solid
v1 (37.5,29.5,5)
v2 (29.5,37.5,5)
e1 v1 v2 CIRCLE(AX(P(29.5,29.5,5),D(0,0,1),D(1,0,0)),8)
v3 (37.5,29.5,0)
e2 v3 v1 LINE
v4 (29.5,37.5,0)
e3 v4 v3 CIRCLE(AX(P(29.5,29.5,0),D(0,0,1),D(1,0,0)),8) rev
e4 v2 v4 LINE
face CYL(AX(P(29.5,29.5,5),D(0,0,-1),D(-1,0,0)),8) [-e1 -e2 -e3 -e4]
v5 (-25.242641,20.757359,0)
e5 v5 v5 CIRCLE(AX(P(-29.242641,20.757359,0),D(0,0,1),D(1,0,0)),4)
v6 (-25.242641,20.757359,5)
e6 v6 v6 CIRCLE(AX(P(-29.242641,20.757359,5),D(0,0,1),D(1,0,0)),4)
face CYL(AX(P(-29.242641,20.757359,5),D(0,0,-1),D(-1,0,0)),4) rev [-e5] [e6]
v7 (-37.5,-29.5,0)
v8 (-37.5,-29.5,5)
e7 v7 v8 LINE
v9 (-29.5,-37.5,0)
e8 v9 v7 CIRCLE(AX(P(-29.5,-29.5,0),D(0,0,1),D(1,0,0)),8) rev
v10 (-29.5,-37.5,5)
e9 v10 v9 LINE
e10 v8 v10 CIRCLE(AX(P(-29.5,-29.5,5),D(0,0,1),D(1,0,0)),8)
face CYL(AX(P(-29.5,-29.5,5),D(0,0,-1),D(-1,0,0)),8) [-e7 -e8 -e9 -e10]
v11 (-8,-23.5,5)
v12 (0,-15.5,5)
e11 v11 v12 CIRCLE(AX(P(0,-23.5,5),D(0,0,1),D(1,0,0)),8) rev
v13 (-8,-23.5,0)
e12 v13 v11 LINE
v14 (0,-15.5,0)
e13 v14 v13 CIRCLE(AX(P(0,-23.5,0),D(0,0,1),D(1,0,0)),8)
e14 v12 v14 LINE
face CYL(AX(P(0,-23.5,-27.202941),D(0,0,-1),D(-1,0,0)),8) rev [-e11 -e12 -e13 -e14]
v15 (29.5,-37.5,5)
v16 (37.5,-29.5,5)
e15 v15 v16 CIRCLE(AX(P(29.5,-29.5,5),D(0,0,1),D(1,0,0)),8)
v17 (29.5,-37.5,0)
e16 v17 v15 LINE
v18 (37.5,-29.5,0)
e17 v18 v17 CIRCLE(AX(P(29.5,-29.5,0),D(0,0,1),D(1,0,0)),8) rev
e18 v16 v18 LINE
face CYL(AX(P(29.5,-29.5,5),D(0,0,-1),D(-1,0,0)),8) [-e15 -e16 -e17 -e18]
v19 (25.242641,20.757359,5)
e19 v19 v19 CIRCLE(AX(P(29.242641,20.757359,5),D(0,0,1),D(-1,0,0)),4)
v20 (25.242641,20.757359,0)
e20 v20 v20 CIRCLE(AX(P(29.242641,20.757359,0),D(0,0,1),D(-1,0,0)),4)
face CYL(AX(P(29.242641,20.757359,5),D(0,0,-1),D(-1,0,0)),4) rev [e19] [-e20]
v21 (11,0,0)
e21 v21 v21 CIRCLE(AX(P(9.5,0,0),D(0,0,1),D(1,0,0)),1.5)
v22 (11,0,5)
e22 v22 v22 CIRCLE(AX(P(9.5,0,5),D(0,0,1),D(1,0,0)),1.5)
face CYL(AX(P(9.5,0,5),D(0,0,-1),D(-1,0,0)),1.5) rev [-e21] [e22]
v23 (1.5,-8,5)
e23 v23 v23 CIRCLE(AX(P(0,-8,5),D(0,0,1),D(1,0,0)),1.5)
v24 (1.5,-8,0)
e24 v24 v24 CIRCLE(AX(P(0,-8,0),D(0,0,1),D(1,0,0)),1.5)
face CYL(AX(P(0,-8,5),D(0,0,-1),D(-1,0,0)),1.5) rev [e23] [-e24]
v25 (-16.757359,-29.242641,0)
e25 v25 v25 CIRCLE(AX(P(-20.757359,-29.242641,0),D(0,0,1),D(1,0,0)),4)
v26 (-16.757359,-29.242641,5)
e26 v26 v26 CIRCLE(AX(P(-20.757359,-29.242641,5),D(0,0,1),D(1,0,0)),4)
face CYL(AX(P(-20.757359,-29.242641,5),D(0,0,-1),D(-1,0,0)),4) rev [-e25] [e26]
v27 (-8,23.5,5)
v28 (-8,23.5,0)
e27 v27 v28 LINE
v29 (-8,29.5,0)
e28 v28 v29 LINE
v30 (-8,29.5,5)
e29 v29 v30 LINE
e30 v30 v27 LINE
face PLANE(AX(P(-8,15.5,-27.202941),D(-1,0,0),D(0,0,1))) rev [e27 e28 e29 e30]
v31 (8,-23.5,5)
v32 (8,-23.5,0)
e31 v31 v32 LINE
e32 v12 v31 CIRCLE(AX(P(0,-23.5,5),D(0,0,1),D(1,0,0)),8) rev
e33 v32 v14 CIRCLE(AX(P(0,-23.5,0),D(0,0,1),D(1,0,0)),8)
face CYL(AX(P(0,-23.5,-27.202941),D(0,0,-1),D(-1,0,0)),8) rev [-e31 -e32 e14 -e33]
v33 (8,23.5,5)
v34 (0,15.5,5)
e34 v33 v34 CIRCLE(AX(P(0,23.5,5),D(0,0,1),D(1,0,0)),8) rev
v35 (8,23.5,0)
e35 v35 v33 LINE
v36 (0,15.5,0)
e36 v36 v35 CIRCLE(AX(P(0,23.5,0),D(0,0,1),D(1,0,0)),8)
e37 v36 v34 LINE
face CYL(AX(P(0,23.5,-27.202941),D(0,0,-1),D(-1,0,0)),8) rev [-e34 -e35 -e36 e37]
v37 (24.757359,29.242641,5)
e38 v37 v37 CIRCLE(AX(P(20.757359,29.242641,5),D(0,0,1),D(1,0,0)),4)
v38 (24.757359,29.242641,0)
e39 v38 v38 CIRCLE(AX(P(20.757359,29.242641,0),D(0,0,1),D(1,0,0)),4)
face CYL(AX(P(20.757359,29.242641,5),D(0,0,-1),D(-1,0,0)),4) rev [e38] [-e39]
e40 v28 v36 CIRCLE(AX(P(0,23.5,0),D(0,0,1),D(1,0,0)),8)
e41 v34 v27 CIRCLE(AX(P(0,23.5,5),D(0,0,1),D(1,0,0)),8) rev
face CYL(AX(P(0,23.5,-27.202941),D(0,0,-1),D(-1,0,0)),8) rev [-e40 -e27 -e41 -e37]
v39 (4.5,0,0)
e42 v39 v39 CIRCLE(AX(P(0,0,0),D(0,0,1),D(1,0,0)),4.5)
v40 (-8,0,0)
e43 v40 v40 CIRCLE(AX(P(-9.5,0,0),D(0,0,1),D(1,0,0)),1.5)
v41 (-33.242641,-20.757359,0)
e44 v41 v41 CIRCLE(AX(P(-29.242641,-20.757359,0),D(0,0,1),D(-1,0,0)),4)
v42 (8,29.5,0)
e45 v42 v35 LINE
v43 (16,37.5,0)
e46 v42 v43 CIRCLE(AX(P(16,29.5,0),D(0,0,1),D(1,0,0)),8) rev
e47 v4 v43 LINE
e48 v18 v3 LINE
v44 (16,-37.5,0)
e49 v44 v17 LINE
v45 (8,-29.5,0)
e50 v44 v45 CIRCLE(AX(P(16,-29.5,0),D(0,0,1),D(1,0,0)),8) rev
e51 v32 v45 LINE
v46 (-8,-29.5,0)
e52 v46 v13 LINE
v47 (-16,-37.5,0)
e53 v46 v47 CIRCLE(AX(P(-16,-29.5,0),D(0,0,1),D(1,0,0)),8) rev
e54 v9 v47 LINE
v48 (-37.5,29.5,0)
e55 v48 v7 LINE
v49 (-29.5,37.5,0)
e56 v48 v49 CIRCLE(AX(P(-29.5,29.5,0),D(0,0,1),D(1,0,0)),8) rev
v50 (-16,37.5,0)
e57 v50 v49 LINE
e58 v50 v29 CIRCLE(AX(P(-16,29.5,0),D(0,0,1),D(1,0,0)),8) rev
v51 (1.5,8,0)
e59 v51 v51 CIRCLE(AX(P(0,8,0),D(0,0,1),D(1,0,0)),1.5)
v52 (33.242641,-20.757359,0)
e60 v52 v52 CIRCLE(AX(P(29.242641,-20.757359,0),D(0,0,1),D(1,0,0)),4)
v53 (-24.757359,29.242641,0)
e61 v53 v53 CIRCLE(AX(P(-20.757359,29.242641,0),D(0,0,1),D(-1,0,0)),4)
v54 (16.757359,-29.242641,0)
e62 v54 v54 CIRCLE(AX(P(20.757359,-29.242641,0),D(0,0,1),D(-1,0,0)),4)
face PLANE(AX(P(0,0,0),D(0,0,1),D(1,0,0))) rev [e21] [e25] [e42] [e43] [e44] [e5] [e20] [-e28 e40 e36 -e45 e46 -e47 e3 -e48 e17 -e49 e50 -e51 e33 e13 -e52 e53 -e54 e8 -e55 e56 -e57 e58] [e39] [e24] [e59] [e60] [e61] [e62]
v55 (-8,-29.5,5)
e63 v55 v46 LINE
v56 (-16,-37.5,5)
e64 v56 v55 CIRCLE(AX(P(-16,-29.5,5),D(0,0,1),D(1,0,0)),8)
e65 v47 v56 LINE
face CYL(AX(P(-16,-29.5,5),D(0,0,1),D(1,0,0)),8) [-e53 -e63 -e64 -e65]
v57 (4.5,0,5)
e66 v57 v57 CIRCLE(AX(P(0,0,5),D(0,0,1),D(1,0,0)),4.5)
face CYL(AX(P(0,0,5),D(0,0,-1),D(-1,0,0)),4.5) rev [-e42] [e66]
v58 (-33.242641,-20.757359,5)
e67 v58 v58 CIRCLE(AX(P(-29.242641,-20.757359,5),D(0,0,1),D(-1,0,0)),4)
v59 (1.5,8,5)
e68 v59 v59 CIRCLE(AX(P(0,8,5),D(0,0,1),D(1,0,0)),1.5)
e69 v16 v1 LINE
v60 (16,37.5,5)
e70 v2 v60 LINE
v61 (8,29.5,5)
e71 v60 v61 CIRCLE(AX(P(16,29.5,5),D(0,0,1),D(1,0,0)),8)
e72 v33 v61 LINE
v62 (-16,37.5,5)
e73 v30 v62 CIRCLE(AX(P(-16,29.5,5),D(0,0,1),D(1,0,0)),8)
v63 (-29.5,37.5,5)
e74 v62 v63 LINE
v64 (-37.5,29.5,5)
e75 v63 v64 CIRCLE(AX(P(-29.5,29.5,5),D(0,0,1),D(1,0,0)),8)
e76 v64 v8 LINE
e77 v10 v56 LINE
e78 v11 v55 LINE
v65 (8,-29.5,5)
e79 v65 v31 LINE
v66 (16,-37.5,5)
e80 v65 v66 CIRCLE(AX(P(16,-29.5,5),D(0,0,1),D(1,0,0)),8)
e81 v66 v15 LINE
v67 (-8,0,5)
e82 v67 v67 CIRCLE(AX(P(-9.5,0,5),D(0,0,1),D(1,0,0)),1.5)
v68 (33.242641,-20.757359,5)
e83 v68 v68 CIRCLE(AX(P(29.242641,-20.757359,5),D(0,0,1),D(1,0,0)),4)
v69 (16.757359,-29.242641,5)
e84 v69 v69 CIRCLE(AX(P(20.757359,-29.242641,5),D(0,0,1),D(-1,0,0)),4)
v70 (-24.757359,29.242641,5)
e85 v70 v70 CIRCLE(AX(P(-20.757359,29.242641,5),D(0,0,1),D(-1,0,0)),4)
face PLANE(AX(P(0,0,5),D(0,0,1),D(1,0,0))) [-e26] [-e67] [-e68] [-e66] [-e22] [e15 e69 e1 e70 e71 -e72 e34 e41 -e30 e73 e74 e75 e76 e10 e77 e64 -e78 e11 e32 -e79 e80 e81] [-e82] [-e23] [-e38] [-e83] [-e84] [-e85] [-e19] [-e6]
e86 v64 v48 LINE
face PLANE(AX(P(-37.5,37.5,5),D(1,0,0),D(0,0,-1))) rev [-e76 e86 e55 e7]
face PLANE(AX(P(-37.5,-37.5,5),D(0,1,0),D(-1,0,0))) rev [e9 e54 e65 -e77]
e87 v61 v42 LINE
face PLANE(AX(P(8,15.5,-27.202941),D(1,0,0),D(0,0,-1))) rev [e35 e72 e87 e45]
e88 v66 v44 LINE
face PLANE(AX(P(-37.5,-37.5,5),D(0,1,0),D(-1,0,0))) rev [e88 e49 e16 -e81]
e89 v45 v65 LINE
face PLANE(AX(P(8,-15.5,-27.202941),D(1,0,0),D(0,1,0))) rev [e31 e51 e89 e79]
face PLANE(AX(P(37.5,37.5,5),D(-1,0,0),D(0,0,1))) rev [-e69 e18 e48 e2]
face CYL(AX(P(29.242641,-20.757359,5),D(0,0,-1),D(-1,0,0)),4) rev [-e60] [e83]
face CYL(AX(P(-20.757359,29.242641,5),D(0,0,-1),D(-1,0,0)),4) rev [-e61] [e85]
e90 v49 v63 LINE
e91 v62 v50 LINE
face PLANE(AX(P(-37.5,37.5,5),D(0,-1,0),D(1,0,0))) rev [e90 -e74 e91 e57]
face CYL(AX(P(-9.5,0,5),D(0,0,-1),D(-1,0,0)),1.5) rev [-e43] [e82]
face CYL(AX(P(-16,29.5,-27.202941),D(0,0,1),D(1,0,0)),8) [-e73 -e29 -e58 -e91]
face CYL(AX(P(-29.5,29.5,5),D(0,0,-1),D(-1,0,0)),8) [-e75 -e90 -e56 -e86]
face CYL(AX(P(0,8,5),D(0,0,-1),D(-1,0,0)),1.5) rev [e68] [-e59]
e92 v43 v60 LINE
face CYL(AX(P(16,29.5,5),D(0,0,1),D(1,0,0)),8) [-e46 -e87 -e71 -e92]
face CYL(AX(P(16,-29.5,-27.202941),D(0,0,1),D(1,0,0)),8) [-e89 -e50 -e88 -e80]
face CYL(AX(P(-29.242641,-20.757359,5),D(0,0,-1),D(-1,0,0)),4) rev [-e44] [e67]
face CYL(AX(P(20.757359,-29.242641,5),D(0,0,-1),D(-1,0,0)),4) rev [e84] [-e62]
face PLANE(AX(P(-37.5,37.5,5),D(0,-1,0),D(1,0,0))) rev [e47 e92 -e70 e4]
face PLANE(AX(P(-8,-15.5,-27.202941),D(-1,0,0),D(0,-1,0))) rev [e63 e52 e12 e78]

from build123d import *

# Parameters (mm, degrees)
SKETCH1_W           = 75
SKETCH1_H           = 75
SKETCH1_R           = 1.5
SKETCH1_R_2         = 4.5
SKETCH1_R_3         = 4
BOSS_EXTRUDE1_DEPTH = 5
SKETCH3_W           = 16
SKETCH3_H           = 22
CUT_EXTRUDE1_DEPTH  = 5
FILLET1_R           = 8


with BuildPart() as part:
    # Sketch1 → Boss-Extrude1 (new body)
    with BuildSketch(Plane(origin=(0, 0, 0), x_dir=(-1, 0, 0), z_dir=(0, 0, 1))):
        Rectangle(SKETCH1_W, SKETCH1_H)
        with Locations(Location((9.5, 0, 0), (0, 0, 180))):
            Circle(SKETCH1_R, mode=Mode.SUBTRACT)
        with Locations(Location((-9.5, 0, 0), (0, 0, 180))):
            Circle(SKETCH1_R, mode=Mode.SUBTRACT)
        with Locations(Location((0, -8, 0), (0, 0, 180))):
            Circle(SKETCH1_R, mode=Mode.SUBTRACT)
        with Locations(Location((0, 8, 0), (0, 0, 180))):
            Circle(SKETCH1_R, mode=Mode.SUBTRACT)
        with Locations(Location((0, 0, 0), (0, 0, 180))):
            Circle(SKETCH1_R_2, mode=Mode.SUBTRACT)
        with Locations(Location((20.757359313, 29.242640687, 0), (0, 0, 180))):
            Circle(SKETCH1_R_3, mode=Mode.SUBTRACT)
        with Locations((29.242640687, 20.757359313)):
            Circle(SKETCH1_R_3, mode=Mode.SUBTRACT)
        with Locations((-29.242640687, -20.757359313)):
            Circle(SKETCH1_R_3, mode=Mode.SUBTRACT)
        with Locations(Location((-20.757359313, -29.242640687, 0), (0, 0, 180))):
            Circle(SKETCH1_R_3, mode=Mode.SUBTRACT)
        with Locations((20.757359313, -29.242640687)):
            Circle(SKETCH1_R_3, mode=Mode.SUBTRACT)
        with Locations(Location((29.242640687, -20.757359313, 0), (0, 0, 180))):
            Circle(SKETCH1_R_3, mode=Mode.SUBTRACT)
        with Locations((-20.757359313, 29.242640687)):
            Circle(SKETCH1_R_3, mode=Mode.SUBTRACT)
        with Locations(Location((-29.242640687, 20.757359313, 0), (0, 0, 180))):
            Circle(SKETCH1_R_3, mode=Mode.SUBTRACT)
    extrude(amount=BOSS_EXTRUDE1_DEPTH)

    # Sketch3 → Cut-Extrude1 (cut)
    with BuildSketch(Plane.XY.offset(5)):
        with Locations((0, 26.5)):
            Rectangle(SKETCH3_W, SKETCH3_H)
        with Locations((0, -26.5)):
            Rectangle(SKETCH3_W, SKETCH3_H)
    extrude(amount=-CUT_EXTRUDE1_DEPTH, mode=Mode.SUBTRACT)

    # Fillet1
    fillet1_edges = [part.edges().sort_by_distance(p)[0] for p in [
        (-37.5, -37.5, 2.5),
        (-8, -37.5, 2.5),
        (8, -15.5, 2.5),
        (-8, -15.5, 2.5),
        (8, -37.5, 2.5),
        (37.5, -37.5, 2.5),
        (37.5, 37.5, 2.5),
        (8, 37.5, 2.5),
        (8, 15.5, 2.5),
        (-8, 15.5, 2.5),
        (-8, 37.5, 2.5),
        (-37.5, 37.5, 2.5),
    ]]
    fillet(fillet1_edges, radius=FILLET1_R - 0.0001)  # a hair under: the kernel refuses the full size


solid = part.part
